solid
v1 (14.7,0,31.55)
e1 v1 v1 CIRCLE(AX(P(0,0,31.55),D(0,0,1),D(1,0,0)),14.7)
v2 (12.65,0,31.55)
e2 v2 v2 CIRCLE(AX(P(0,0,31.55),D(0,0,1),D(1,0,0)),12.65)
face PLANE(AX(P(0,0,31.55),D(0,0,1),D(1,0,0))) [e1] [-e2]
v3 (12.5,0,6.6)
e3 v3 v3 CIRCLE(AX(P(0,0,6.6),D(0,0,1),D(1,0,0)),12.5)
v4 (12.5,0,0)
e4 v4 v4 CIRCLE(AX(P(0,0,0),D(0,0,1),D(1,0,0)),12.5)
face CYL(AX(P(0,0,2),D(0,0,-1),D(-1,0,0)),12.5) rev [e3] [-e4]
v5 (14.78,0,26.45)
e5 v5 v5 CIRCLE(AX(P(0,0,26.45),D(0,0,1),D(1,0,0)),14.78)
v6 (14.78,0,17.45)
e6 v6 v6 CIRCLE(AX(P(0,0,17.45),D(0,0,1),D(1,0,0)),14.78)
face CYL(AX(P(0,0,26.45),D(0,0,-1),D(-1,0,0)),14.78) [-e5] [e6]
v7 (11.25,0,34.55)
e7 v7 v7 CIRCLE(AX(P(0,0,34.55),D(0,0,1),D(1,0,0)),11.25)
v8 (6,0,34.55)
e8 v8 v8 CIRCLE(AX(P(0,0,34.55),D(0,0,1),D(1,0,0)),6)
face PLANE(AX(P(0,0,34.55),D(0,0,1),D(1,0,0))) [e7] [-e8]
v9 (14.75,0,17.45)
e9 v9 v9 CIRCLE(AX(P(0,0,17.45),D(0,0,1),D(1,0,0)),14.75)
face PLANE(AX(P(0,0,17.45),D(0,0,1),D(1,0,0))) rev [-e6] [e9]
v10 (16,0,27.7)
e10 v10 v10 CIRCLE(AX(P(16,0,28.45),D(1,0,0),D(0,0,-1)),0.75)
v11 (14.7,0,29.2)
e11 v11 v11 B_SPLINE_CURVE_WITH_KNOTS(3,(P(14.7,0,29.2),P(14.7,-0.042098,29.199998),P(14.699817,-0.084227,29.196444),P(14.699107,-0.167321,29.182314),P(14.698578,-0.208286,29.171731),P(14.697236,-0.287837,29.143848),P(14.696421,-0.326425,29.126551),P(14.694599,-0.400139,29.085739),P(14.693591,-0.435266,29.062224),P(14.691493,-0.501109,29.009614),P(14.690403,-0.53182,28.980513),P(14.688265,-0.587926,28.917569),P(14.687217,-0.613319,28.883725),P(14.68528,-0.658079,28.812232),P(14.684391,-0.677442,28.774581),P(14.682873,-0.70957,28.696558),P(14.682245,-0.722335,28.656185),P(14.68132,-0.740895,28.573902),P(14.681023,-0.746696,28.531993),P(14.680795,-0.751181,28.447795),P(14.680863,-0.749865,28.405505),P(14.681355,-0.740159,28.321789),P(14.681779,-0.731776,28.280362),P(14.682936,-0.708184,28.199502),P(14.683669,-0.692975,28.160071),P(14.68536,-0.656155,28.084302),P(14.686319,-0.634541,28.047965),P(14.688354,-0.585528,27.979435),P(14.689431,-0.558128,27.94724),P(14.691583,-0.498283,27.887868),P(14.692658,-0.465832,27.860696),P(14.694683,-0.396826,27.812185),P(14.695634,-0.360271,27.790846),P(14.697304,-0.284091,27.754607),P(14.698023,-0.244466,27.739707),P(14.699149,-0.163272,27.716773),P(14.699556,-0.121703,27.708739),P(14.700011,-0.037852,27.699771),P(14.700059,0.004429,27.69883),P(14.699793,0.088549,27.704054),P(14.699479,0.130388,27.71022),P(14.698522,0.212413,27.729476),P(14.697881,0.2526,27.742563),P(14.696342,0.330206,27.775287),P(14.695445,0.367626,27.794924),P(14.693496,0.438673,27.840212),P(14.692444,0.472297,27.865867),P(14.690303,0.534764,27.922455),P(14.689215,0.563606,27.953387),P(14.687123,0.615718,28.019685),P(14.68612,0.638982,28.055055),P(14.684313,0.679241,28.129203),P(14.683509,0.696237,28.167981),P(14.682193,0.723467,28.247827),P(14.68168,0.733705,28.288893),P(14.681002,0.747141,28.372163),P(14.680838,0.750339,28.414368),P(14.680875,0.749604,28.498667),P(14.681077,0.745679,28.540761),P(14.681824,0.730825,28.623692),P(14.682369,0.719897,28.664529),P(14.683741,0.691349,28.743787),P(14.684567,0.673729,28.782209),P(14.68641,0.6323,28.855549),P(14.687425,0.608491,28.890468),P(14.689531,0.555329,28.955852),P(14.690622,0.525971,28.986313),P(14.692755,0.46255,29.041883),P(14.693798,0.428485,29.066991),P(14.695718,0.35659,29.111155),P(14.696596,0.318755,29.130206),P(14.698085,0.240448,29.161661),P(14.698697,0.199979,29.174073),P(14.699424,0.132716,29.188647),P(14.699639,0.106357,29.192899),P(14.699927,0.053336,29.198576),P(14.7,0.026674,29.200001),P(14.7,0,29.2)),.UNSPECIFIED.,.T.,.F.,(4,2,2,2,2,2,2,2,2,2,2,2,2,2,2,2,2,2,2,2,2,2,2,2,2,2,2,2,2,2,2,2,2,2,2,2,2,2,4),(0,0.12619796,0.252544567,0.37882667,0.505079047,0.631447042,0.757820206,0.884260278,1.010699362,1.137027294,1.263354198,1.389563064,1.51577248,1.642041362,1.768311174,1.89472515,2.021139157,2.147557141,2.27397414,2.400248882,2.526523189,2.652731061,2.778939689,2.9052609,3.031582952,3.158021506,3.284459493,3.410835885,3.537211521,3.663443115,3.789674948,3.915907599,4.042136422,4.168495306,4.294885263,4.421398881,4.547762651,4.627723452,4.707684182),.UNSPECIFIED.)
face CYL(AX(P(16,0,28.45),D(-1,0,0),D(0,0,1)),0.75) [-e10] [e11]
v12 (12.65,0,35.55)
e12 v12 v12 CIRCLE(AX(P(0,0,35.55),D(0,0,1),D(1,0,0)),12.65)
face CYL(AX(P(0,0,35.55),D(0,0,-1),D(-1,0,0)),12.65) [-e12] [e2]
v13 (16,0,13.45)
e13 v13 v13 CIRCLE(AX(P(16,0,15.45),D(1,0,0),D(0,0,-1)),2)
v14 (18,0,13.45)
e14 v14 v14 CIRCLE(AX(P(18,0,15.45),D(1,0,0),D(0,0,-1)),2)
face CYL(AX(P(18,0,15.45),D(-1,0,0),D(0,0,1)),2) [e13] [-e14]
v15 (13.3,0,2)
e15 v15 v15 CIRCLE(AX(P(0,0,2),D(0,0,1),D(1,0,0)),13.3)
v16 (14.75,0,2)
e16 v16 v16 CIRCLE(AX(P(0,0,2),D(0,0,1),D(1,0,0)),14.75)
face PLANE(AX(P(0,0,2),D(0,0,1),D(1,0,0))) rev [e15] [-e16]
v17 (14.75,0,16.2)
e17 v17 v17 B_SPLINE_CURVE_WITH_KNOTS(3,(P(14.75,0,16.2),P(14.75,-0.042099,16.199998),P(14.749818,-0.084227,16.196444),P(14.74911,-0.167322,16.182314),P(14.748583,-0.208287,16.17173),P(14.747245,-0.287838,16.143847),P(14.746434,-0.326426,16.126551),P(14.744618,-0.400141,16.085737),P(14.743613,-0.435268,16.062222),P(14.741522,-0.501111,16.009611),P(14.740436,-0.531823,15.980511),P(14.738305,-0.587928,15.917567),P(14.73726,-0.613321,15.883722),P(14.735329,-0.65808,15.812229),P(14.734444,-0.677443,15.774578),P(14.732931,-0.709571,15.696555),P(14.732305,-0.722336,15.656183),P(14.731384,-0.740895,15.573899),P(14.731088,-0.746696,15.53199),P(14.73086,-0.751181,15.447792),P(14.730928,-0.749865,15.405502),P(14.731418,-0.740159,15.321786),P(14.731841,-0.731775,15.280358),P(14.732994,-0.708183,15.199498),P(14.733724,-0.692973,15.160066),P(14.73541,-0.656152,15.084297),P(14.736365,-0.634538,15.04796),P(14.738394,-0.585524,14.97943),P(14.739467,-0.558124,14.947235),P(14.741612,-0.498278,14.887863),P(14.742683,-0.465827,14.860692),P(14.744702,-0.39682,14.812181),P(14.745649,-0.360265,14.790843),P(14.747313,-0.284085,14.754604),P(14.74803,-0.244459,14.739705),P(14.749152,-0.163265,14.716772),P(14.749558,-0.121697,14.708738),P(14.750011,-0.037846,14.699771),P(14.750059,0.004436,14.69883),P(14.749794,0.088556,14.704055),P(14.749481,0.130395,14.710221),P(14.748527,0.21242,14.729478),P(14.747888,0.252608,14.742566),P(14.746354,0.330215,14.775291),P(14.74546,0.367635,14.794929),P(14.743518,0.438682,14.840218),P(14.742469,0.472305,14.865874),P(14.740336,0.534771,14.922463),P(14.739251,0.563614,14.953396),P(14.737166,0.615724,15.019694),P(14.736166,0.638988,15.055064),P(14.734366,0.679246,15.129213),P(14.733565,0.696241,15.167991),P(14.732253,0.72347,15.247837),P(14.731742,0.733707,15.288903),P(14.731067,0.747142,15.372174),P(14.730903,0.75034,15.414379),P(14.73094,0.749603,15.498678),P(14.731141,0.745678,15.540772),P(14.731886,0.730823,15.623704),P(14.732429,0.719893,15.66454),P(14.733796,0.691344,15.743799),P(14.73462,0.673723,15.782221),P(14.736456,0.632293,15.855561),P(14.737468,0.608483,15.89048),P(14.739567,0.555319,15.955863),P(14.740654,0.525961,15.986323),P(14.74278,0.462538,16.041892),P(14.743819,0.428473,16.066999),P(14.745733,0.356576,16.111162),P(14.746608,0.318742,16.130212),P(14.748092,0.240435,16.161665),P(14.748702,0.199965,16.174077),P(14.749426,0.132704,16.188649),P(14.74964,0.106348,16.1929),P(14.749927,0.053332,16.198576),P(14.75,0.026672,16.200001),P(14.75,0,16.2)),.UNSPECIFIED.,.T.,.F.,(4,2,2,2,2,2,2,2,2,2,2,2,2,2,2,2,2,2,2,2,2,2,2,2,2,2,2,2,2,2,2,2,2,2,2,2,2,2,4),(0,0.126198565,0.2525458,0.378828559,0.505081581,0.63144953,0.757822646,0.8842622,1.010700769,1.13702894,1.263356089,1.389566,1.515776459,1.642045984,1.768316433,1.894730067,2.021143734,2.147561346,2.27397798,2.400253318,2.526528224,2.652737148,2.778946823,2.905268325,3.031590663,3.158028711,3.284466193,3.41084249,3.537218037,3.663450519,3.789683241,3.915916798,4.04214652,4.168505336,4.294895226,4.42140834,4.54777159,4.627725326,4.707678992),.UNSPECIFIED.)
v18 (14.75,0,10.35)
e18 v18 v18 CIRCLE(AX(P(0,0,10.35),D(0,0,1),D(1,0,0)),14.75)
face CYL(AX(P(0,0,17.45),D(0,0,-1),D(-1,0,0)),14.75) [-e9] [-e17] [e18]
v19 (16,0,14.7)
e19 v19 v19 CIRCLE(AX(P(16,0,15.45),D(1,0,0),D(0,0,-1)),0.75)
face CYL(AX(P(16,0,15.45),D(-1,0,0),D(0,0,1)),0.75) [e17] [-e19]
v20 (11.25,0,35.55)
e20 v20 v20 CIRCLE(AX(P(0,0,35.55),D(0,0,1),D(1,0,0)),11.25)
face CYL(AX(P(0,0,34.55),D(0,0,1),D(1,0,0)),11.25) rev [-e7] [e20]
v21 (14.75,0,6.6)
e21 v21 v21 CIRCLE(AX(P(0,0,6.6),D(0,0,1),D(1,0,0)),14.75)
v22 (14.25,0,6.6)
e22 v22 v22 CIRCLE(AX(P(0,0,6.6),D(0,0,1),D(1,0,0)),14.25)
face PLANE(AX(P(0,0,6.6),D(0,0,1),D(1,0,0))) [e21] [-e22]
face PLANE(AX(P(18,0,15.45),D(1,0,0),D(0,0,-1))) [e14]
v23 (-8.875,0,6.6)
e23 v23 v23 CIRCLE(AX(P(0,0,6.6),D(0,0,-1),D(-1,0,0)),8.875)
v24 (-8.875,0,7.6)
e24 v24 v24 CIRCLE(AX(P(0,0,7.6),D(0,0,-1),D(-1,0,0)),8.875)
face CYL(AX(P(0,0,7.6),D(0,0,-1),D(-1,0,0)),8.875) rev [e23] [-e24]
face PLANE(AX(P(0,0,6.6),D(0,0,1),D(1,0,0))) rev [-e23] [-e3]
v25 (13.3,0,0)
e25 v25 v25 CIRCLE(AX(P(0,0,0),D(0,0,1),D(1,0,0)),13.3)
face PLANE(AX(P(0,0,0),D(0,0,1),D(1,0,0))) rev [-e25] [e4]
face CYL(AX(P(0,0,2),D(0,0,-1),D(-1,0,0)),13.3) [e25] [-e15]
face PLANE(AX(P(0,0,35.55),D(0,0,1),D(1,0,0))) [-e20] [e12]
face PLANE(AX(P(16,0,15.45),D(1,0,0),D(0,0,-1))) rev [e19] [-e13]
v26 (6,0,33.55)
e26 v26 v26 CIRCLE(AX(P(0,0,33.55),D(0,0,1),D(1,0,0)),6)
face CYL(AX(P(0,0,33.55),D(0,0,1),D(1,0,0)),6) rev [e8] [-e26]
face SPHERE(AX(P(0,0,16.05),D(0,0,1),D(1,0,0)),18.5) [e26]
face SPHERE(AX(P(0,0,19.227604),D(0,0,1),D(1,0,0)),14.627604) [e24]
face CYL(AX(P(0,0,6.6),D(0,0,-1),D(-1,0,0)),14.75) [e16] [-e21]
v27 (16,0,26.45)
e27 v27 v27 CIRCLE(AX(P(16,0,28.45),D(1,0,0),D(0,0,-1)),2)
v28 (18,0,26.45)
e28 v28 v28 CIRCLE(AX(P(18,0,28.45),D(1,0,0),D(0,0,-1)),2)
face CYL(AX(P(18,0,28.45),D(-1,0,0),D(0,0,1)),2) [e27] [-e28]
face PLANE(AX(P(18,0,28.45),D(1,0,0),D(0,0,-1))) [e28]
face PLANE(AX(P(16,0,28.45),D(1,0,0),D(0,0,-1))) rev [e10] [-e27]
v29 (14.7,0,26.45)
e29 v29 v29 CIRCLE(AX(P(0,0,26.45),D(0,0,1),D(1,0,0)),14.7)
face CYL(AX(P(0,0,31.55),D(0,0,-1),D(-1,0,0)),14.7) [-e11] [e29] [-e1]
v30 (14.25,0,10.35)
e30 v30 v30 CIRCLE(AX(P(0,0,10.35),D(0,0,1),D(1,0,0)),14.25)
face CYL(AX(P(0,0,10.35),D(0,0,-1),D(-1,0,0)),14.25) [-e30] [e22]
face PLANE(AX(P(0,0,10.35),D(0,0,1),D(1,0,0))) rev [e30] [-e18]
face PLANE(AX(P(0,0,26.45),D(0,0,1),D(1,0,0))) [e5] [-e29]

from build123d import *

# Parameters (mm, degrees)
SKETCH1_R       = 13.3
SKETCH1_R_2     = 12.5
EXTRUDE1_DEPTH  = 2
SKETCH2_R       = 14.75
SKETCH2_R_2     = 12.5
EXTRUDE2_DEPTH  = 4.6
SKETCH3_R       = 14.25
EXTRUDE3_DEPTH  = 3.75
SKETCH4_R       = 14.75
EXTRUDE4_DEPTH  = 7.1
SKETCH5_R       = 14.78
EXTRUDE5_DEPTH  = 9
SKETCH6_R       = 14.7
EXTRUDE6_DEPTH  = 5.1
SKETCH7_R       = 12.65
EXTRUDE7_DEPTH  = 4
SKETCH8_R       = 11.25
EXTRUDE8_DEPTH  = 1
SKETCH9_R       = 8.875
EXTRUDE9_DEPTH  = 1
SKETCH10_R      = 6
EXTRUDE10_DEPTH = 1
SKETCH11_R      = 0.75
EXTRUDE11_DEPTH = 16
SKETCH12_R      = 2
EXTRUDE12_DEPTH = 2


# Read off the part's stored shape, not the designer's step: Dome1, Dome2
with BuildPart() as part:
    # Sketch1 → Extrude1 (new body)
    with BuildSketch(Plane.XY):
        Circle(SKETCH1_R)
        Circle(SKETCH1_R_2, mode=Mode.SUBTRACT)
    extrude(amount=EXTRUDE1_DEPTH)

    # Sketch2 → Extrude2 (add)
    with BuildSketch(Plane.XY.offset(2)):
        Circle(SKETCH2_R)
        Circle(SKETCH2_R_2, mode=Mode.SUBTRACT)
    extrude(amount=EXTRUDE2_DEPTH)

    # Sketch3 → Extrude3 (add)
    with BuildSketch(Plane.XY.offset(6.6)):
        Circle(SKETCH3_R)
    extrude(amount=EXTRUDE3_DEPTH)

    # Sketch4 → Extrude4 (add)
    with BuildSketch(Plane.XY.offset(10.35)):
        Circle(SKETCH4_R)
    extrude(amount=EXTRUDE4_DEPTH)

    # Sketch5 → Extrude5 (add)
    with BuildSketch(Plane.XY.offset(17.45)):
        Circle(SKETCH5_R)
    extrude(amount=EXTRUDE5_DEPTH)

    # Sketch6 → Extrude6 (add)
    with BuildSketch(Plane.XY.offset(26.45)):
        Circle(SKETCH6_R)
    extrude(amount=EXTRUDE6_DEPTH)

    # Sketch7 → Extrude7 (add)
    with BuildSketch(Plane.XY.offset(31.55)):
        Circle(SKETCH7_R)
    extrude(amount=EXTRUDE7_DEPTH)

    # Sketch8 → Extrude8 (cut)
    with BuildSketch(Plane.XY.offset(35.55)):
        Circle(SKETCH8_R)
    extrude(amount=-EXTRUDE8_DEPTH, mode=Mode.SUBTRACT)

    # Sketch9 → Extrude9 (cut)
    with BuildSketch(Plane(origin=(0, 0, 6.6), x_dir=(-1, 0, 0), z_dir=(0, 0, -1))):
        Circle(SKETCH9_R)
    extrude(amount=-EXTRUDE9_DEPTH, mode=Mode.SUBTRACT)

    # Dome1 outline → Dome1 (revolve)
    with BuildSketch(Plane.XZ):
        with BuildLine():
            Line((0, 7.600000009), (0, 4.6))
            ThreePointArc((0, 4.6), (4.684165488, 5.370281289), (8.875000012, 7.600000009))
            Line((8.875000012, 7.600000009), (0, 7.600000009))
        make_face()
    revolve(axis=Axis((0, 0, 0), (0, 0, 1)))

    # Sketch10 → Extrude10 (cut)
    with BuildSketch(Plane.XY.offset(34.55)):
        Circle(SKETCH10_R)
    extrude(amount=-EXTRUDE10_DEPTH, mode=Mode.SUBTRACT)

    # Dome2 outline → Dome2 (revolve)
    with BuildSketch(Plane.XZ):
        with BuildLine():
            Line((0, 33.55), (6.000000017, 33.549999994))
            ThreePointArc((6.000000017, 33.549999994), (3.041381274, 34.298287589), (0, 34.55))
            Line((0, 34.55), (0, 33.55))
        make_face()
    revolve(axis=Axis((0, 0, 0), (0, 0, 1)))

    # Sketch11 → Extrude11 (add)
    with BuildSketch(Plane(origin=(0, 0, 0), x_dir=(0, 0, -1), z_dir=(1, 0, 0))):
        with Locations((-28.45, 0)):
            Circle(SKETCH11_R)
        with Locations((-15.45, 0)):
            Circle(SKETCH11_R)
    extrude(amount=EXTRUDE11_DEPTH)

    # Sketch12 → Extrude12 (add)
    with BuildSketch(Plane(origin=(16, 0, 0), x_dir=(0, 0, -1), z_dir=(1, 0, 0))):
        with Locations((-28.45, 0)):
            Circle(SKETCH12_R)
        with Locations((-15.45, 0)):
            Circle(SKETCH12_R)
    extrude(amount=EXTRUDE12_DEPTH)


solid = part.part
